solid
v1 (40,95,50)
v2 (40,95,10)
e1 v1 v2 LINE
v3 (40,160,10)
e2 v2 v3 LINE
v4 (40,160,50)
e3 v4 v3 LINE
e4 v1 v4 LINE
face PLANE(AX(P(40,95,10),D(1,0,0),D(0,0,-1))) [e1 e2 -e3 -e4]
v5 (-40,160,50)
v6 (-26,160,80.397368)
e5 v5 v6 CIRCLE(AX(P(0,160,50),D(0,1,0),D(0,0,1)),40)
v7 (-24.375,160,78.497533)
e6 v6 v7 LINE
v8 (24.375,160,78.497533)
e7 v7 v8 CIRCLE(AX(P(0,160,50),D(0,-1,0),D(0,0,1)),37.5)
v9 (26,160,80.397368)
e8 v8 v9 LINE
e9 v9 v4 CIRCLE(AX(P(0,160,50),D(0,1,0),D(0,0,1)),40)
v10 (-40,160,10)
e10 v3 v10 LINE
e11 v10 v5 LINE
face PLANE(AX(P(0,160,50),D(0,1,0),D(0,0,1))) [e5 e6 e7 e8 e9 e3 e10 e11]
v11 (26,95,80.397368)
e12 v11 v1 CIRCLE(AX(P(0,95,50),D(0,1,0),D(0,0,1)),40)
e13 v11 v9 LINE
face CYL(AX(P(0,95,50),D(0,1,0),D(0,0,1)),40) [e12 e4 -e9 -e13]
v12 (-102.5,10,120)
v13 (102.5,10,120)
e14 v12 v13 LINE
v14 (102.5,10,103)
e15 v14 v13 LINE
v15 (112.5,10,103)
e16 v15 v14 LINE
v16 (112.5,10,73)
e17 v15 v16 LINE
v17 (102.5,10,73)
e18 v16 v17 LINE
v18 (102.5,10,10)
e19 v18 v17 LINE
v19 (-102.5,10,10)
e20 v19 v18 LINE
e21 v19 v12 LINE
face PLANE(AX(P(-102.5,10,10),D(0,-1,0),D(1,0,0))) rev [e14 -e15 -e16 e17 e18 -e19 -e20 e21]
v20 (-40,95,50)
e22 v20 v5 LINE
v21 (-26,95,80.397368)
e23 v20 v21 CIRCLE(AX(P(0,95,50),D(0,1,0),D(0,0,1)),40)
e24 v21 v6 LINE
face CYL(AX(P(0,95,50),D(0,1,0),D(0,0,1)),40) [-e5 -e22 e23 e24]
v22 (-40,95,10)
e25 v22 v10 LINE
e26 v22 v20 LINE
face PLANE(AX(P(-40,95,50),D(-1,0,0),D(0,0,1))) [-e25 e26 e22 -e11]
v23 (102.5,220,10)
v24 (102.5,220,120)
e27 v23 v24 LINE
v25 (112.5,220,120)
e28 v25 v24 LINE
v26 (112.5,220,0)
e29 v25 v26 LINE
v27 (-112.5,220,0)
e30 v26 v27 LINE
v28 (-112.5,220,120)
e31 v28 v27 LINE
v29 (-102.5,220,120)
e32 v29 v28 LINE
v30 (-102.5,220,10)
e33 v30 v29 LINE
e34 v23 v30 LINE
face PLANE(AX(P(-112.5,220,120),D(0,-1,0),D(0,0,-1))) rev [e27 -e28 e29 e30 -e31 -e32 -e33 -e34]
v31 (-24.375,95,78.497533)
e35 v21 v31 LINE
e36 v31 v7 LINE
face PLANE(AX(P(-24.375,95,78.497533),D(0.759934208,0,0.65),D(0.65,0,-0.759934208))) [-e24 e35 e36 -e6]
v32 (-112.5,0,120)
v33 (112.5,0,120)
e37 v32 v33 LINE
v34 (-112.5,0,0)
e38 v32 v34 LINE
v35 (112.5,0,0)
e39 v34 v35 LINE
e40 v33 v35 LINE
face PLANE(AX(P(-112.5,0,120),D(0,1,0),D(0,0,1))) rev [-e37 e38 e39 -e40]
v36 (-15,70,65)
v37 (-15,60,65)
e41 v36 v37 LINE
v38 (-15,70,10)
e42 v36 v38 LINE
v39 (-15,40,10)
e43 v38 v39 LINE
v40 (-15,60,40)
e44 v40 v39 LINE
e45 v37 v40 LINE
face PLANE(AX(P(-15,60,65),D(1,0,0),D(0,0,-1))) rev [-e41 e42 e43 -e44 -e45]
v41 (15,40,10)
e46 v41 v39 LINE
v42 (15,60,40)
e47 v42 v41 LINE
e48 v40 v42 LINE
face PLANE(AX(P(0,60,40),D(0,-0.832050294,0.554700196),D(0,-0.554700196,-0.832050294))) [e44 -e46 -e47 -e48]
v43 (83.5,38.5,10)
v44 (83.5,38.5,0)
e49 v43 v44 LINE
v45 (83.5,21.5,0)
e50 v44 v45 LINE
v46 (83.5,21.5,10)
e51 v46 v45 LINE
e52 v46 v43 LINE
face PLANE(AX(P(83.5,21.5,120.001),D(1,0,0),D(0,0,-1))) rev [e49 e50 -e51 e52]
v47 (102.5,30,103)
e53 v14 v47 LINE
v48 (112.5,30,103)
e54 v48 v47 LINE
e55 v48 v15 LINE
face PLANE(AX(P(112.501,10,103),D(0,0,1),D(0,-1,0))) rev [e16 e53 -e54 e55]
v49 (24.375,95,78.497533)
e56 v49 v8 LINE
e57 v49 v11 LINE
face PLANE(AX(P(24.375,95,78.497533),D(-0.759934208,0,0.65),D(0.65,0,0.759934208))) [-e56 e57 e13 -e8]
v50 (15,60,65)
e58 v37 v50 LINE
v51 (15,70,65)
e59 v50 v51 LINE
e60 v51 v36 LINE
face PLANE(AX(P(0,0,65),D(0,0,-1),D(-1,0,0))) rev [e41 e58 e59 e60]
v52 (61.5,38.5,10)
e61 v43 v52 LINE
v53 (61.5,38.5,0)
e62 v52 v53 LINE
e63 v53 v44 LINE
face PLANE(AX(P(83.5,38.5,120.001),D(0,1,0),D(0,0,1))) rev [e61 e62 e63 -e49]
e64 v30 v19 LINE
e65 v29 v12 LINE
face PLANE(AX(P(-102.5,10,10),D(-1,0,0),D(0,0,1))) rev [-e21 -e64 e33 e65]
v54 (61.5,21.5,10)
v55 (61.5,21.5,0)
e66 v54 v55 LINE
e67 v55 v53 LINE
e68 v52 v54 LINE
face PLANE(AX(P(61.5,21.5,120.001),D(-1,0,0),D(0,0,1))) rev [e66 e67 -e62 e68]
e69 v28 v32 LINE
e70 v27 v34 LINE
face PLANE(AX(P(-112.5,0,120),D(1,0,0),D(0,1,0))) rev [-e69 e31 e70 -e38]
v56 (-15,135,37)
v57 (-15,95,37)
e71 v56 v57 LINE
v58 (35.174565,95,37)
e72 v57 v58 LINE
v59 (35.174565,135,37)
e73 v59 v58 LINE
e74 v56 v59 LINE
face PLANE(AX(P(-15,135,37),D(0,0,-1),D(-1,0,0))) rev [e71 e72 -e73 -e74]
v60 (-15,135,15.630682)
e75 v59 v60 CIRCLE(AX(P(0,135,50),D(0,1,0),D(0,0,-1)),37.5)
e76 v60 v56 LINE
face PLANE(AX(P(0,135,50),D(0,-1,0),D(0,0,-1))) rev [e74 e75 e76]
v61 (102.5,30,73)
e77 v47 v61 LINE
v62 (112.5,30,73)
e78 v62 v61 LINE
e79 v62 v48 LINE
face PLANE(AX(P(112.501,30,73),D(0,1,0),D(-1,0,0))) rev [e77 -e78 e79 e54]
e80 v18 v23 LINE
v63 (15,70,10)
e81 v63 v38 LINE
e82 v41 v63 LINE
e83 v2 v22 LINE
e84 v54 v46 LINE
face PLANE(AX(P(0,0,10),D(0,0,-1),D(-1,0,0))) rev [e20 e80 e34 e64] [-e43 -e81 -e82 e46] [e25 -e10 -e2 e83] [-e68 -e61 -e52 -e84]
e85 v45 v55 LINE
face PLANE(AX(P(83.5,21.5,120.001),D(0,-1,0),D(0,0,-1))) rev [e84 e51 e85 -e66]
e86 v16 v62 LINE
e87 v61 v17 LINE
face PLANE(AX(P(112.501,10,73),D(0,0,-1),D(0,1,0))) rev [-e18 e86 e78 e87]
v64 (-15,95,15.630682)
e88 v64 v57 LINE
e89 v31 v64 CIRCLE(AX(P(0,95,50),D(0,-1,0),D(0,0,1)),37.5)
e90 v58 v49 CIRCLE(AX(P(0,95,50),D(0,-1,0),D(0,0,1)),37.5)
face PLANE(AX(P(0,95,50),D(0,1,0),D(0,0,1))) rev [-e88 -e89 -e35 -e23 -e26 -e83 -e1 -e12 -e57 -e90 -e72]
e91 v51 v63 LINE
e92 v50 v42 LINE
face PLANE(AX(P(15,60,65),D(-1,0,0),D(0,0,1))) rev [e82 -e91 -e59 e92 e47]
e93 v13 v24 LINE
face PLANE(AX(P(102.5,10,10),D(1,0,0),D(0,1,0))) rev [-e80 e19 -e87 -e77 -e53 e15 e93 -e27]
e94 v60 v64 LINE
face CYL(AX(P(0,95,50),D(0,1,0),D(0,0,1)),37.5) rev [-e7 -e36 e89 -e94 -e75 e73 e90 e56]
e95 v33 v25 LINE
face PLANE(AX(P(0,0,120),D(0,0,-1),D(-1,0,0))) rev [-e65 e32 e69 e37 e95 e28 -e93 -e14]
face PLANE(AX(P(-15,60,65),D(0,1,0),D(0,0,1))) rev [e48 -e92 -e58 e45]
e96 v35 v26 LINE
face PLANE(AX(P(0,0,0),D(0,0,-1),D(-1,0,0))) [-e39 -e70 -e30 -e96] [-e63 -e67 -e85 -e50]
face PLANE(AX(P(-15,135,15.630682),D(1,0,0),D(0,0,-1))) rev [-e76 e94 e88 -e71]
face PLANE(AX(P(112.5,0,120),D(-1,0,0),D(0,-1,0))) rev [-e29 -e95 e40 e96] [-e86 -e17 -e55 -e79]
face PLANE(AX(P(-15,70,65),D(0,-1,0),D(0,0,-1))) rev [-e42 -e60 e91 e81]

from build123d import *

# Parameters (mm, degrees)
CROQUIS1_W                  = 225
CROQUIS1_H                  = 220
SALIENTE_EXTRUIR1_DEPTH     = 120
CROQUIS2_W                  = 205
CROQUIS2_H                  = 210
CORTAR_EXTRUIR1_DEPTH       = 110
CROQUIS3_W                  = 30
CROQUIS3_H                  = 10
SALIENTE_EXTRUIR2_DEPTH     = 55
NERVIO4_REACH               = 276.693
CROQUIS6_WALL_W             = 587.44153369
CROQUIS6_WALL_H             = 30
SALIENTE_EXTRUIR3_DEPTH     = 65
SALIENTE_EXTRUIR4_START     = -15
SALIENTE_EXTRUIR4_OUTLINE_W = 40
SALIENTE_EXTRUIR4_OUTLINE_H = 27
SALIENTE_EXTRUIR4_DEPTH     = 52.5
CORTAR_EXTRUIR2_REACH       = 332.189
CROQUIS10_W                 = 30
CROQUIS10_H                 = 20
CORTAR_EXTRUIR3_REACH       = 276.693
CROQUIS11_W                 = 22
CROQUIS11_H                 = 17


with BuildPart() as part:
    # Croquis1 → Saliente-Extruir1 (new body)
    with BuildSketch(Plane.XY):
        with Locations((0, 110)):
            Rectangle(CROQUIS1_W, CROQUIS1_H)
    extrude(amount=SALIENTE_EXTRUIR1_DEPTH)

    # Croquis2 → Cortar-Extruir1 (cut)
    with BuildSketch(Plane.XY.offset(120)):
        with Locations((0, 115)):
            Rectangle(CROQUIS2_W, CROQUIS2_H)
    extrude(amount=-CORTAR_EXTRUIR1_DEPTH, mode=Mode.SUBTRACT)

    # Croquis3 → Saliente-Extruir2 (add)
    with BuildSketch(Plane.XY.offset(10)):
        with Locations((0, 65)):
            Rectangle(CROQUIS3_W, CROQUIS3_H)
    extrude(amount=SALIENTE_EXTRUIR2_DEPTH)

    # Croquis6 wall → Nervio4 (add, up to next)
    with BuildSketch(Plane(origin=(0, 50, 25), x_dir=(0, -0.554700196225, -0.832050294338), z_dir=(0, 0.832050294338, -0.554700196225)), mode=Mode.PRIVATE) as nervio4_sk1:
        Rectangle(CROQUIS6_WALL_W, CROQUIS6_WALL_H)
    nervio4_tool1 = extrude(nervio4_sk1.sketch, amount=NERVIO4_REACH, mode=Mode.PRIVATE) - part.part
    add(nervio4_tool1.solids().sort_by_distance((0, 50, 25))[0])



with BuildPart() as body_2:
    # Croquis7 → Saliente-Extruir3 (new body)
    with BuildSketch(Plane(origin=(0, 160, 0), x_dir=(1, 0, 0), z_dir=(0, 1, 0))):
        with BuildLine():
            Line((-40, -50), (-40, -10))
            Line((-40, -10), (0, -10))
            Line((0, -10), (40, -10))
            Line((40, -10), (40, -50))
            ThreePointArc((40, -50), (36.331804249, -66.733200531), (26, -80.397368307))
            Line((26, -80.397368307), (24.375, -78.497532788))
            ThreePointArc((24.375, -78.497532788), (0, -12.5), (-24.375, -78.497532788))
            Line((-24.375, -78.497532788), (-26, -80.397368307))
            ThreePointArc((-26, -80.397368307), (-36.331804249, -66.733200531), (-40, -50))
        make_face()
    extrude(amount=-SALIENTE_EXTRUIR3_DEPTH)


with BuildPart() as part_1:
    add(part.part)

    add(body_2.part)  # Saliente-Extruir4 merges body 2
    # Saliente-Extruir4: read off the stored shape, not the designer's step
    # Saliente-Extruir4 outline → Saliente-Extruir4 (add)
    with BuildSketch(Plane.YZ.offset(SALIENTE_EXTRUIR4_START)):
        with Locations((115, 23.5)):
            Rectangle(SALIENTE_EXTRUIR4_OUTLINE_W, SALIENTE_EXTRUIR4_OUTLINE_H)
    extrude(amount=SALIENTE_EXTRUIR4_DEPTH)

    # Croquis10 → Cortar-Extruir2 (cut, up to next)
    with BuildSketch(Plane.ZY.offset(-102.5), mode=Mode.PRIVATE) as cortar_extruir2_sk1:
        with Locations((88, 20)):
            Rectangle(CROQUIS10_W, CROQUIS10_H)
    cortar_extruir2_tool1 = extrude(cortar_extruir2_sk1.sketch, amount=-CORTAR_EXTRUIR2_REACH, mode=Mode.PRIVATE) & part_1.part
    add(cortar_extruir2_tool1.solids().sort_by_distance((102.5, 20, 88))[0], mode=Mode.SUBTRACT)

    # Croquis11 → Cortar-Extruir3 (cut, up to next)
    with BuildSketch(Plane(origin=(0, 0, 0), x_dir=(-1, 0, 0), z_dir=(0, 0, -1)), mode=Mode.PRIVATE) as cortar_extruir3_sk1:
        with Locations((-72.5, 30)):
            Rectangle(CROQUIS11_W, CROQUIS11_H)
    cortar_extruir3_tool1 = extrude(cortar_extruir3_sk1.sketch, amount=-CORTAR_EXTRUIR3_REACH, mode=Mode.PRIVATE) & part_1.part
    add(cortar_extruir3_tool1.solids().sort_by_distance((72.5, 30, 0))[0], mode=Mode.SUBTRACT)


solid = part_1.part
